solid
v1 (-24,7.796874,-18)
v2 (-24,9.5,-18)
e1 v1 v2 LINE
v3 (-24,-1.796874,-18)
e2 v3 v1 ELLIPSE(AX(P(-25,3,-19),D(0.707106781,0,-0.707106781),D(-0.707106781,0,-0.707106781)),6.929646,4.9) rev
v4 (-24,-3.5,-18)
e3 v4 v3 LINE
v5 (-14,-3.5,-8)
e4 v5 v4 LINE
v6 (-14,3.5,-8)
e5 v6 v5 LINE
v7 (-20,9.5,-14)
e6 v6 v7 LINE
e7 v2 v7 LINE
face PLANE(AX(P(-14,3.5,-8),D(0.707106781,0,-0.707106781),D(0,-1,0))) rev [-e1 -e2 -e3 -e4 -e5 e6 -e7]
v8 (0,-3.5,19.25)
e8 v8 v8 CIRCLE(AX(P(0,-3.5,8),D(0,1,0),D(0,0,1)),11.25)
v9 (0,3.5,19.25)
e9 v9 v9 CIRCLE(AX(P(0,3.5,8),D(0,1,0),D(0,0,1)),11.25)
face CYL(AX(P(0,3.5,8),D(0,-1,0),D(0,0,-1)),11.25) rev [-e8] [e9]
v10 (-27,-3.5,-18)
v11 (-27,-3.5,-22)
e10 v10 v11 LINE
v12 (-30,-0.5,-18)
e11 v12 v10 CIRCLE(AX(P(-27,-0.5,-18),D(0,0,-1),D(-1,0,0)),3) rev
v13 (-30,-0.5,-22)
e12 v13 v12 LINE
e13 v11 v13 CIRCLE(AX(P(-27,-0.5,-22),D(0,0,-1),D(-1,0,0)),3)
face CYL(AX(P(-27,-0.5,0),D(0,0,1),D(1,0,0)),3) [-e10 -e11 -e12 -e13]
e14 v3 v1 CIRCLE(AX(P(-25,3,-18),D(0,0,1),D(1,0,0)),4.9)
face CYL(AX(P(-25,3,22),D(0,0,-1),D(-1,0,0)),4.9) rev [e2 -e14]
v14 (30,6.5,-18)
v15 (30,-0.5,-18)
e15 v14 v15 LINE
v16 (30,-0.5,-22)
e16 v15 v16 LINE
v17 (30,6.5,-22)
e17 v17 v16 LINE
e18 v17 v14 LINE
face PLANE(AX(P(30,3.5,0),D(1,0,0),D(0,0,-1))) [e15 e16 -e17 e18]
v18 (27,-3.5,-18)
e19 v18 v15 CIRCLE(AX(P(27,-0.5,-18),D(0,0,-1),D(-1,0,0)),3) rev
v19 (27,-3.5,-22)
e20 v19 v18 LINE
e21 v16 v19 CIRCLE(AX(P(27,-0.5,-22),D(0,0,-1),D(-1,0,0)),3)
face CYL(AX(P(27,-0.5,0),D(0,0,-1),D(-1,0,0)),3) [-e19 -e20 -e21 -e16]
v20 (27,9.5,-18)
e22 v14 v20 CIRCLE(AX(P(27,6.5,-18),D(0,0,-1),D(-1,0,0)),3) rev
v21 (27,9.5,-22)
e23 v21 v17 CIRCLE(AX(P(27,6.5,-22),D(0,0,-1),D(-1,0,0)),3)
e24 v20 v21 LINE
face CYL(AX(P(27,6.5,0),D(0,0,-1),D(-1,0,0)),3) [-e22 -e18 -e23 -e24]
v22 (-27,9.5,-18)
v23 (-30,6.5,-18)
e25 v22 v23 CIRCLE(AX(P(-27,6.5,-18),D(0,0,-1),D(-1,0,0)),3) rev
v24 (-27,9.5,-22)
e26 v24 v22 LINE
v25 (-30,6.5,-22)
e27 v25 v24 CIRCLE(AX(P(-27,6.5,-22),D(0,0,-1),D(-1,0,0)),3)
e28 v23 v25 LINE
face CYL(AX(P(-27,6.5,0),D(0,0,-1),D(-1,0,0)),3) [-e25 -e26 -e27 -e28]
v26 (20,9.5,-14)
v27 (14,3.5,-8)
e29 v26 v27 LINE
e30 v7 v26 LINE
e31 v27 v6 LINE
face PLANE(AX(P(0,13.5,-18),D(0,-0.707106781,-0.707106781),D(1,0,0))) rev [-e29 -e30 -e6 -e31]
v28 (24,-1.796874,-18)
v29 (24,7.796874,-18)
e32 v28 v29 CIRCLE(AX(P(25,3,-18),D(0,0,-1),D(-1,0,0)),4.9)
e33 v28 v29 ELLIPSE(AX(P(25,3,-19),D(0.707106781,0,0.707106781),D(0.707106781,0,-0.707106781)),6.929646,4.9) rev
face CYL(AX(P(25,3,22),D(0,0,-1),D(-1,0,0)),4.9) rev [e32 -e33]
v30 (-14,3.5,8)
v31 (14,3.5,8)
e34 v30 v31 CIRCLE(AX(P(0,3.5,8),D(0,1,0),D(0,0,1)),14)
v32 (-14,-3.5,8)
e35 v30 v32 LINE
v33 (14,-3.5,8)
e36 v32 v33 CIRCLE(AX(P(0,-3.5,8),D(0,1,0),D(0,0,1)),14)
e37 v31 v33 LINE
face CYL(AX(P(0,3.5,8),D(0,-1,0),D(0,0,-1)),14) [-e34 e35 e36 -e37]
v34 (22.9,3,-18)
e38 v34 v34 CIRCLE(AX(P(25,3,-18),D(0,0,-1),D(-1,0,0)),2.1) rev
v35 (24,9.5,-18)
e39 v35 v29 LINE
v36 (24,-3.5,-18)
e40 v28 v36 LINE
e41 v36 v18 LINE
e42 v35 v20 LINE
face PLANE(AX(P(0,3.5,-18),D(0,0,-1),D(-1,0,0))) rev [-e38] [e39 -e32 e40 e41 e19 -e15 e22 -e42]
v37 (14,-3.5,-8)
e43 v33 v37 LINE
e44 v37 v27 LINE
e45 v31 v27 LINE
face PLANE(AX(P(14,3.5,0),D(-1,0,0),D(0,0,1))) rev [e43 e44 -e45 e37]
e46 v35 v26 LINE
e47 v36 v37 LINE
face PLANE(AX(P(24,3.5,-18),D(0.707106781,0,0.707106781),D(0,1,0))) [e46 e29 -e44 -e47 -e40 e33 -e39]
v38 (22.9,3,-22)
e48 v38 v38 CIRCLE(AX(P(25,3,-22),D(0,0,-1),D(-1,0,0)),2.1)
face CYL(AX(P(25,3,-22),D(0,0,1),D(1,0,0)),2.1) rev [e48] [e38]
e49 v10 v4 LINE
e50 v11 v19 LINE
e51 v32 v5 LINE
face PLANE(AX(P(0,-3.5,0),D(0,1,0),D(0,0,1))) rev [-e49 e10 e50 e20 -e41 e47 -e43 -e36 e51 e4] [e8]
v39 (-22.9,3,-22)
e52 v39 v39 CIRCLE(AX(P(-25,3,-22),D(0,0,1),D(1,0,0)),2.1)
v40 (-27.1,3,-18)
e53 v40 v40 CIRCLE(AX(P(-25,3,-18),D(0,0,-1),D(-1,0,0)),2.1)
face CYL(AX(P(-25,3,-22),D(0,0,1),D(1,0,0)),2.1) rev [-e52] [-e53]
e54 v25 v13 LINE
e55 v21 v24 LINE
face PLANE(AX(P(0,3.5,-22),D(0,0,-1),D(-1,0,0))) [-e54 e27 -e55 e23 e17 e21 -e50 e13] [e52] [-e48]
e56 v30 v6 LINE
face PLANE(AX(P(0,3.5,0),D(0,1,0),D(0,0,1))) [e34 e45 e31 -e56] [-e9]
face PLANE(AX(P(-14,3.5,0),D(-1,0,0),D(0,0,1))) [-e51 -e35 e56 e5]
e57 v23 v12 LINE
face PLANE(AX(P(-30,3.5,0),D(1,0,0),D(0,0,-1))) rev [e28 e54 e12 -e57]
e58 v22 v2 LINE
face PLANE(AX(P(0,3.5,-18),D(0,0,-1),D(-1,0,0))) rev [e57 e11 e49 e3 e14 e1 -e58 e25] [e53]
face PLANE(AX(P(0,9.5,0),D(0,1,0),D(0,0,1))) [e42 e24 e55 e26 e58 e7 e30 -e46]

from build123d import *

# Parameters (mm, degrees)
ESBO_O1_R                = 14
ESBO_O1_R_2              = 11.25
RESSALTO_EXTRUS_O1_DEPTH = 3.5
ESBO_O2_W                = 60
ESBO_O2_H                = 4
RESSALTO_EXTRUS_O2_DEPTH = 6
CHANFRO3_SIZE            = 10
CHANFRO5_SIZE            = 10
ESBO_O6_R                = 2.1
CORTE_EXTRUS_O2_DEPTH    = 51.89449872
ESBO_O7_R                = 4.9
CORTE_EXTRUS_O6_DEPTH    = 51.89449872
FILETE1_R                = 3


with BuildPart() as part:
    # Esboço1 → Ressalto-extrusão1 (new, symmetric)
    # profile 1 of 3: a face of its own
    with BuildSketch(Plane(origin=(0, 0, 0), x_dir=(1, 0, 0), z_dir=(0, 1, 0))):
        Polygon((30, 22), (-30, 22), (-30, 18), (-14, 18), (14, 18), (30, 18), align=None)
    # profile 2 of 3: a face of its own
    with BuildSketch(Plane(origin=(0, 0, 0), x_dir=(1, 0, 0), z_dir=(0, 1, 0))):
        with BuildLine():
            Line((14, 18), (-14, 18))
            Line((-14, 18), (-14, -8))
            ThreePointArc((-14, -8), (0, 6), (14, -8))
            Line((14, -8), (14, 18))
        make_face()
    # profile 3 of 3: a face of its own
    with BuildSketch(Plane(origin=(0, 0, 0), x_dir=(1, 0, 0), z_dir=(0, 1, 0))):
        with Locations((0, -8)):
            Circle(ESBO_O1_R)
        with Locations(Location((0, -8, 0), (0, 0, 270))):
            Circle(ESBO_O1_R_2, mode=Mode.SUBTRACT)
    extrude(amount=RESSALTO_EXTRUS_O1_DEPTH, both=True)

    # Esboço2 → Ressalto-extrusão2 (add)
    with BuildSketch(Plane(origin=(0, 3.5, 0), x_dir=(1, 0, 0), z_dir=(0, 1, 0))):
        with Locations((0, 20)):
            Rectangle(ESBO_O2_W, ESBO_O2_H)
    extrude(amount=RESSALTO_EXTRUS_O2_DEPTH)

    # Chanfro3
    chanfro3_edges = [part.edges().sort_by_distance(p)[0] for p in [
        (14, 0, -18),
        (-14, 0, -18),
    ]]
    chamfer(chanfro3_edges, length=CHANFRO3_SIZE)

    # Chanfro5
    # the kernel refuses this chamfer: 10 mm, written as the material it adds along each edge
    with BuildSketch(Plane(origin=(-49.71682988, 3.5, -18), x_dir=(0, 0.9996219169112968, -0.027495876610586317), z_dir=(1, 0, 0))) as chanfro5_piece_1_section:
        Polygon((CHANFRO5_SIZE * 0.999621916911, CHANFRO5_SIZE * 0.0274958766106), (-CHANFRO5_SIZE * 0.0274958766106, CHANFRO5_SIZE * 0.999621916911), (0, 0), align=None)
    chanfro5_piece_1 = extrude(amount=99.433659759, mode=Mode.PRIVATE)
    chanfro5_piece_1 = split(chanfro5_piece_1, bisect_by=Plane(origin=(-17.624703453, 9.5, -15.249406907), z_dir=(0, -1, 0)), keep=Keep.TOP, mode=Mode.PRIVATE)
    chanfro5_piece_1 = split(chanfro5_piece_1, bisect_by=Plane(origin=(-19.43705518, 6.203831668, -13.43705518), z_dir=(0.7071067811865475, 0, -0.7071067811865477)), keep=Keep.TOP, mode=Mode.PRIVATE)
    chanfro5_piece_1 = split(chanfro5_piece_1, bisect_by=Plane(origin=(-14, 6.203831668, -15.249406907), z_dir=(-1, 0, 0)), keep=Keep.TOP, mode=Mode.PRIVATE)
    add(chanfro5_piece_1)
    with BuildSketch(Plane(origin=(-49.71682988, 3.5, -18), x_dir=(0, 0.9996219169112968, -0.027495876610586317), z_dir=(1, 0, 0))) as chanfro5_piece_2_section:
        Polygon((CHANFRO5_SIZE * 0.999621916911, CHANFRO5_SIZE * 0.0274958766106), (-CHANFRO5_SIZE * 0.0274958766106, CHANFRO5_SIZE * 0.999621916911), (0, 0), align=None)
    chanfro5_piece_2 = extrude(amount=99.433659759, mode=Mode.PRIVATE)
    chanfro5_piece_2 = split(chanfro5_piece_2, bisect_by=Plane(origin=(0, 9.5, -14.250020725), z_dir=(0, -1, 0)), keep=Keep.TOP, mode=Mode.PRIVATE)
    chanfro5_piece_2 = split(chanfro5_piece_2, bisect_by=Plane(origin=(10.125010362, 5.933615653, -4.125010362), z_dir=(-0.7071067811865479, 0, -0.7071067811865474)), keep=Keep.TOP, mode=Mode.PRIVATE)
    chanfro5_piece_2 = split(chanfro5_piece_2, bisect_by=Plane(origin=(14, 5.933615653, -14.250020725), z_dir=(-1, 0, 0)), keep=Keep.TOP, mode=Mode.PRIVATE)
    chanfro5_piece_2 = split(chanfro5_piece_2, bisect_by=Plane(origin=(-14, 5.933615653, -14.250020725), z_dir=(1, 0, 0)), keep=Keep.TOP, mode=Mode.PRIVATE)
    add(chanfro5_piece_2)
    with BuildSketch(Plane(origin=(-49.71682988, 3.5, -18), x_dir=(0, 0.9996219169112968, -0.027495876610586317), z_dir=(1, 0, 0))) as chanfro5_piece_3_section:
        Polygon((CHANFRO5_SIZE * 0.999621916911, CHANFRO5_SIZE * 0.0274958766106), (-CHANFRO5_SIZE * 0.0274958766106, CHANFRO5_SIZE * 0.999621916911), (0, 0), align=None)
    chanfro5_piece_3 = extrude(amount=99.433659759, mode=Mode.PRIVATE)
    chanfro5_piece_3 = split(chanfro5_piece_3, bisect_by=Plane(origin=(17.624703453, 9.5, -15.249406907), z_dir=(0, -1, 0)), keep=Keep.TOP, mode=Mode.PRIVATE)
    chanfro5_piece_3 = split(chanfro5_piece_3, bisect_by=Plane(origin=(19.43705518, 6.203831668, -13.43705518), z_dir=(-0.7071067811865479, 0, -0.7071067811865474)), keep=Keep.TOP, mode=Mode.PRIVATE)
    chanfro5_piece_3 = split(chanfro5_piece_3, bisect_by=Plane(origin=(14, 6.203831668, -15.249406907), z_dir=(1, 0, 0)), keep=Keep.TOP, mode=Mode.PRIVATE)
    add(chanfro5_piece_3)

    # Esboço6 → Corte-extrusão2 (cut, symmetric)
    with BuildSketch(Plane.XY.offset(-18)):
        with Locations((-25, 3)):
            Circle(ESBO_O6_R)
    corte_extrus_o2 = extrude(amount=CORTE_EXTRUS_O2_DEPTH, both=True, mode=Mode.SUBTRACT)

    # Esboço7 → Corte-extrusão6 (cut, through all)
    with BuildSketch(Plane.XY.offset(-18)):
        with Locations((-25, 3)):
            Circle(ESBO_O7_R)
    corte_extrus_o6 = extrude(amount=CORTE_EXTRUS_O6_DEPTH, mode=Mode.SUBTRACT)

    # Espelhar2: Corte-extrusão2, Corte-extrusão6 across plane
    add(corte_extrus_o2.mirror(Plane(origin=(0, 0, 0), x_dir=(0, 0, 1), z_dir=(1, 0, 0))), mode=Mode.SUBTRACT)
    add(corte_extrus_o6.mirror(Plane(origin=(0, 0, 0), x_dir=(0, 0, 1), z_dir=(1, 0, 0))), mode=Mode.SUBTRACT)

    # Filete1
    filete1_edges = [part.edges().sort_by_distance(p)[0] for p in [
        (30, -3.5, -20),
        (-30, -3.5, -20),
        (-30, 9.5, -20),
        (30, 9.5, -20),
    ]]
    fillet(filete1_edges, radius=FILETE1_R)


solid = part.part
